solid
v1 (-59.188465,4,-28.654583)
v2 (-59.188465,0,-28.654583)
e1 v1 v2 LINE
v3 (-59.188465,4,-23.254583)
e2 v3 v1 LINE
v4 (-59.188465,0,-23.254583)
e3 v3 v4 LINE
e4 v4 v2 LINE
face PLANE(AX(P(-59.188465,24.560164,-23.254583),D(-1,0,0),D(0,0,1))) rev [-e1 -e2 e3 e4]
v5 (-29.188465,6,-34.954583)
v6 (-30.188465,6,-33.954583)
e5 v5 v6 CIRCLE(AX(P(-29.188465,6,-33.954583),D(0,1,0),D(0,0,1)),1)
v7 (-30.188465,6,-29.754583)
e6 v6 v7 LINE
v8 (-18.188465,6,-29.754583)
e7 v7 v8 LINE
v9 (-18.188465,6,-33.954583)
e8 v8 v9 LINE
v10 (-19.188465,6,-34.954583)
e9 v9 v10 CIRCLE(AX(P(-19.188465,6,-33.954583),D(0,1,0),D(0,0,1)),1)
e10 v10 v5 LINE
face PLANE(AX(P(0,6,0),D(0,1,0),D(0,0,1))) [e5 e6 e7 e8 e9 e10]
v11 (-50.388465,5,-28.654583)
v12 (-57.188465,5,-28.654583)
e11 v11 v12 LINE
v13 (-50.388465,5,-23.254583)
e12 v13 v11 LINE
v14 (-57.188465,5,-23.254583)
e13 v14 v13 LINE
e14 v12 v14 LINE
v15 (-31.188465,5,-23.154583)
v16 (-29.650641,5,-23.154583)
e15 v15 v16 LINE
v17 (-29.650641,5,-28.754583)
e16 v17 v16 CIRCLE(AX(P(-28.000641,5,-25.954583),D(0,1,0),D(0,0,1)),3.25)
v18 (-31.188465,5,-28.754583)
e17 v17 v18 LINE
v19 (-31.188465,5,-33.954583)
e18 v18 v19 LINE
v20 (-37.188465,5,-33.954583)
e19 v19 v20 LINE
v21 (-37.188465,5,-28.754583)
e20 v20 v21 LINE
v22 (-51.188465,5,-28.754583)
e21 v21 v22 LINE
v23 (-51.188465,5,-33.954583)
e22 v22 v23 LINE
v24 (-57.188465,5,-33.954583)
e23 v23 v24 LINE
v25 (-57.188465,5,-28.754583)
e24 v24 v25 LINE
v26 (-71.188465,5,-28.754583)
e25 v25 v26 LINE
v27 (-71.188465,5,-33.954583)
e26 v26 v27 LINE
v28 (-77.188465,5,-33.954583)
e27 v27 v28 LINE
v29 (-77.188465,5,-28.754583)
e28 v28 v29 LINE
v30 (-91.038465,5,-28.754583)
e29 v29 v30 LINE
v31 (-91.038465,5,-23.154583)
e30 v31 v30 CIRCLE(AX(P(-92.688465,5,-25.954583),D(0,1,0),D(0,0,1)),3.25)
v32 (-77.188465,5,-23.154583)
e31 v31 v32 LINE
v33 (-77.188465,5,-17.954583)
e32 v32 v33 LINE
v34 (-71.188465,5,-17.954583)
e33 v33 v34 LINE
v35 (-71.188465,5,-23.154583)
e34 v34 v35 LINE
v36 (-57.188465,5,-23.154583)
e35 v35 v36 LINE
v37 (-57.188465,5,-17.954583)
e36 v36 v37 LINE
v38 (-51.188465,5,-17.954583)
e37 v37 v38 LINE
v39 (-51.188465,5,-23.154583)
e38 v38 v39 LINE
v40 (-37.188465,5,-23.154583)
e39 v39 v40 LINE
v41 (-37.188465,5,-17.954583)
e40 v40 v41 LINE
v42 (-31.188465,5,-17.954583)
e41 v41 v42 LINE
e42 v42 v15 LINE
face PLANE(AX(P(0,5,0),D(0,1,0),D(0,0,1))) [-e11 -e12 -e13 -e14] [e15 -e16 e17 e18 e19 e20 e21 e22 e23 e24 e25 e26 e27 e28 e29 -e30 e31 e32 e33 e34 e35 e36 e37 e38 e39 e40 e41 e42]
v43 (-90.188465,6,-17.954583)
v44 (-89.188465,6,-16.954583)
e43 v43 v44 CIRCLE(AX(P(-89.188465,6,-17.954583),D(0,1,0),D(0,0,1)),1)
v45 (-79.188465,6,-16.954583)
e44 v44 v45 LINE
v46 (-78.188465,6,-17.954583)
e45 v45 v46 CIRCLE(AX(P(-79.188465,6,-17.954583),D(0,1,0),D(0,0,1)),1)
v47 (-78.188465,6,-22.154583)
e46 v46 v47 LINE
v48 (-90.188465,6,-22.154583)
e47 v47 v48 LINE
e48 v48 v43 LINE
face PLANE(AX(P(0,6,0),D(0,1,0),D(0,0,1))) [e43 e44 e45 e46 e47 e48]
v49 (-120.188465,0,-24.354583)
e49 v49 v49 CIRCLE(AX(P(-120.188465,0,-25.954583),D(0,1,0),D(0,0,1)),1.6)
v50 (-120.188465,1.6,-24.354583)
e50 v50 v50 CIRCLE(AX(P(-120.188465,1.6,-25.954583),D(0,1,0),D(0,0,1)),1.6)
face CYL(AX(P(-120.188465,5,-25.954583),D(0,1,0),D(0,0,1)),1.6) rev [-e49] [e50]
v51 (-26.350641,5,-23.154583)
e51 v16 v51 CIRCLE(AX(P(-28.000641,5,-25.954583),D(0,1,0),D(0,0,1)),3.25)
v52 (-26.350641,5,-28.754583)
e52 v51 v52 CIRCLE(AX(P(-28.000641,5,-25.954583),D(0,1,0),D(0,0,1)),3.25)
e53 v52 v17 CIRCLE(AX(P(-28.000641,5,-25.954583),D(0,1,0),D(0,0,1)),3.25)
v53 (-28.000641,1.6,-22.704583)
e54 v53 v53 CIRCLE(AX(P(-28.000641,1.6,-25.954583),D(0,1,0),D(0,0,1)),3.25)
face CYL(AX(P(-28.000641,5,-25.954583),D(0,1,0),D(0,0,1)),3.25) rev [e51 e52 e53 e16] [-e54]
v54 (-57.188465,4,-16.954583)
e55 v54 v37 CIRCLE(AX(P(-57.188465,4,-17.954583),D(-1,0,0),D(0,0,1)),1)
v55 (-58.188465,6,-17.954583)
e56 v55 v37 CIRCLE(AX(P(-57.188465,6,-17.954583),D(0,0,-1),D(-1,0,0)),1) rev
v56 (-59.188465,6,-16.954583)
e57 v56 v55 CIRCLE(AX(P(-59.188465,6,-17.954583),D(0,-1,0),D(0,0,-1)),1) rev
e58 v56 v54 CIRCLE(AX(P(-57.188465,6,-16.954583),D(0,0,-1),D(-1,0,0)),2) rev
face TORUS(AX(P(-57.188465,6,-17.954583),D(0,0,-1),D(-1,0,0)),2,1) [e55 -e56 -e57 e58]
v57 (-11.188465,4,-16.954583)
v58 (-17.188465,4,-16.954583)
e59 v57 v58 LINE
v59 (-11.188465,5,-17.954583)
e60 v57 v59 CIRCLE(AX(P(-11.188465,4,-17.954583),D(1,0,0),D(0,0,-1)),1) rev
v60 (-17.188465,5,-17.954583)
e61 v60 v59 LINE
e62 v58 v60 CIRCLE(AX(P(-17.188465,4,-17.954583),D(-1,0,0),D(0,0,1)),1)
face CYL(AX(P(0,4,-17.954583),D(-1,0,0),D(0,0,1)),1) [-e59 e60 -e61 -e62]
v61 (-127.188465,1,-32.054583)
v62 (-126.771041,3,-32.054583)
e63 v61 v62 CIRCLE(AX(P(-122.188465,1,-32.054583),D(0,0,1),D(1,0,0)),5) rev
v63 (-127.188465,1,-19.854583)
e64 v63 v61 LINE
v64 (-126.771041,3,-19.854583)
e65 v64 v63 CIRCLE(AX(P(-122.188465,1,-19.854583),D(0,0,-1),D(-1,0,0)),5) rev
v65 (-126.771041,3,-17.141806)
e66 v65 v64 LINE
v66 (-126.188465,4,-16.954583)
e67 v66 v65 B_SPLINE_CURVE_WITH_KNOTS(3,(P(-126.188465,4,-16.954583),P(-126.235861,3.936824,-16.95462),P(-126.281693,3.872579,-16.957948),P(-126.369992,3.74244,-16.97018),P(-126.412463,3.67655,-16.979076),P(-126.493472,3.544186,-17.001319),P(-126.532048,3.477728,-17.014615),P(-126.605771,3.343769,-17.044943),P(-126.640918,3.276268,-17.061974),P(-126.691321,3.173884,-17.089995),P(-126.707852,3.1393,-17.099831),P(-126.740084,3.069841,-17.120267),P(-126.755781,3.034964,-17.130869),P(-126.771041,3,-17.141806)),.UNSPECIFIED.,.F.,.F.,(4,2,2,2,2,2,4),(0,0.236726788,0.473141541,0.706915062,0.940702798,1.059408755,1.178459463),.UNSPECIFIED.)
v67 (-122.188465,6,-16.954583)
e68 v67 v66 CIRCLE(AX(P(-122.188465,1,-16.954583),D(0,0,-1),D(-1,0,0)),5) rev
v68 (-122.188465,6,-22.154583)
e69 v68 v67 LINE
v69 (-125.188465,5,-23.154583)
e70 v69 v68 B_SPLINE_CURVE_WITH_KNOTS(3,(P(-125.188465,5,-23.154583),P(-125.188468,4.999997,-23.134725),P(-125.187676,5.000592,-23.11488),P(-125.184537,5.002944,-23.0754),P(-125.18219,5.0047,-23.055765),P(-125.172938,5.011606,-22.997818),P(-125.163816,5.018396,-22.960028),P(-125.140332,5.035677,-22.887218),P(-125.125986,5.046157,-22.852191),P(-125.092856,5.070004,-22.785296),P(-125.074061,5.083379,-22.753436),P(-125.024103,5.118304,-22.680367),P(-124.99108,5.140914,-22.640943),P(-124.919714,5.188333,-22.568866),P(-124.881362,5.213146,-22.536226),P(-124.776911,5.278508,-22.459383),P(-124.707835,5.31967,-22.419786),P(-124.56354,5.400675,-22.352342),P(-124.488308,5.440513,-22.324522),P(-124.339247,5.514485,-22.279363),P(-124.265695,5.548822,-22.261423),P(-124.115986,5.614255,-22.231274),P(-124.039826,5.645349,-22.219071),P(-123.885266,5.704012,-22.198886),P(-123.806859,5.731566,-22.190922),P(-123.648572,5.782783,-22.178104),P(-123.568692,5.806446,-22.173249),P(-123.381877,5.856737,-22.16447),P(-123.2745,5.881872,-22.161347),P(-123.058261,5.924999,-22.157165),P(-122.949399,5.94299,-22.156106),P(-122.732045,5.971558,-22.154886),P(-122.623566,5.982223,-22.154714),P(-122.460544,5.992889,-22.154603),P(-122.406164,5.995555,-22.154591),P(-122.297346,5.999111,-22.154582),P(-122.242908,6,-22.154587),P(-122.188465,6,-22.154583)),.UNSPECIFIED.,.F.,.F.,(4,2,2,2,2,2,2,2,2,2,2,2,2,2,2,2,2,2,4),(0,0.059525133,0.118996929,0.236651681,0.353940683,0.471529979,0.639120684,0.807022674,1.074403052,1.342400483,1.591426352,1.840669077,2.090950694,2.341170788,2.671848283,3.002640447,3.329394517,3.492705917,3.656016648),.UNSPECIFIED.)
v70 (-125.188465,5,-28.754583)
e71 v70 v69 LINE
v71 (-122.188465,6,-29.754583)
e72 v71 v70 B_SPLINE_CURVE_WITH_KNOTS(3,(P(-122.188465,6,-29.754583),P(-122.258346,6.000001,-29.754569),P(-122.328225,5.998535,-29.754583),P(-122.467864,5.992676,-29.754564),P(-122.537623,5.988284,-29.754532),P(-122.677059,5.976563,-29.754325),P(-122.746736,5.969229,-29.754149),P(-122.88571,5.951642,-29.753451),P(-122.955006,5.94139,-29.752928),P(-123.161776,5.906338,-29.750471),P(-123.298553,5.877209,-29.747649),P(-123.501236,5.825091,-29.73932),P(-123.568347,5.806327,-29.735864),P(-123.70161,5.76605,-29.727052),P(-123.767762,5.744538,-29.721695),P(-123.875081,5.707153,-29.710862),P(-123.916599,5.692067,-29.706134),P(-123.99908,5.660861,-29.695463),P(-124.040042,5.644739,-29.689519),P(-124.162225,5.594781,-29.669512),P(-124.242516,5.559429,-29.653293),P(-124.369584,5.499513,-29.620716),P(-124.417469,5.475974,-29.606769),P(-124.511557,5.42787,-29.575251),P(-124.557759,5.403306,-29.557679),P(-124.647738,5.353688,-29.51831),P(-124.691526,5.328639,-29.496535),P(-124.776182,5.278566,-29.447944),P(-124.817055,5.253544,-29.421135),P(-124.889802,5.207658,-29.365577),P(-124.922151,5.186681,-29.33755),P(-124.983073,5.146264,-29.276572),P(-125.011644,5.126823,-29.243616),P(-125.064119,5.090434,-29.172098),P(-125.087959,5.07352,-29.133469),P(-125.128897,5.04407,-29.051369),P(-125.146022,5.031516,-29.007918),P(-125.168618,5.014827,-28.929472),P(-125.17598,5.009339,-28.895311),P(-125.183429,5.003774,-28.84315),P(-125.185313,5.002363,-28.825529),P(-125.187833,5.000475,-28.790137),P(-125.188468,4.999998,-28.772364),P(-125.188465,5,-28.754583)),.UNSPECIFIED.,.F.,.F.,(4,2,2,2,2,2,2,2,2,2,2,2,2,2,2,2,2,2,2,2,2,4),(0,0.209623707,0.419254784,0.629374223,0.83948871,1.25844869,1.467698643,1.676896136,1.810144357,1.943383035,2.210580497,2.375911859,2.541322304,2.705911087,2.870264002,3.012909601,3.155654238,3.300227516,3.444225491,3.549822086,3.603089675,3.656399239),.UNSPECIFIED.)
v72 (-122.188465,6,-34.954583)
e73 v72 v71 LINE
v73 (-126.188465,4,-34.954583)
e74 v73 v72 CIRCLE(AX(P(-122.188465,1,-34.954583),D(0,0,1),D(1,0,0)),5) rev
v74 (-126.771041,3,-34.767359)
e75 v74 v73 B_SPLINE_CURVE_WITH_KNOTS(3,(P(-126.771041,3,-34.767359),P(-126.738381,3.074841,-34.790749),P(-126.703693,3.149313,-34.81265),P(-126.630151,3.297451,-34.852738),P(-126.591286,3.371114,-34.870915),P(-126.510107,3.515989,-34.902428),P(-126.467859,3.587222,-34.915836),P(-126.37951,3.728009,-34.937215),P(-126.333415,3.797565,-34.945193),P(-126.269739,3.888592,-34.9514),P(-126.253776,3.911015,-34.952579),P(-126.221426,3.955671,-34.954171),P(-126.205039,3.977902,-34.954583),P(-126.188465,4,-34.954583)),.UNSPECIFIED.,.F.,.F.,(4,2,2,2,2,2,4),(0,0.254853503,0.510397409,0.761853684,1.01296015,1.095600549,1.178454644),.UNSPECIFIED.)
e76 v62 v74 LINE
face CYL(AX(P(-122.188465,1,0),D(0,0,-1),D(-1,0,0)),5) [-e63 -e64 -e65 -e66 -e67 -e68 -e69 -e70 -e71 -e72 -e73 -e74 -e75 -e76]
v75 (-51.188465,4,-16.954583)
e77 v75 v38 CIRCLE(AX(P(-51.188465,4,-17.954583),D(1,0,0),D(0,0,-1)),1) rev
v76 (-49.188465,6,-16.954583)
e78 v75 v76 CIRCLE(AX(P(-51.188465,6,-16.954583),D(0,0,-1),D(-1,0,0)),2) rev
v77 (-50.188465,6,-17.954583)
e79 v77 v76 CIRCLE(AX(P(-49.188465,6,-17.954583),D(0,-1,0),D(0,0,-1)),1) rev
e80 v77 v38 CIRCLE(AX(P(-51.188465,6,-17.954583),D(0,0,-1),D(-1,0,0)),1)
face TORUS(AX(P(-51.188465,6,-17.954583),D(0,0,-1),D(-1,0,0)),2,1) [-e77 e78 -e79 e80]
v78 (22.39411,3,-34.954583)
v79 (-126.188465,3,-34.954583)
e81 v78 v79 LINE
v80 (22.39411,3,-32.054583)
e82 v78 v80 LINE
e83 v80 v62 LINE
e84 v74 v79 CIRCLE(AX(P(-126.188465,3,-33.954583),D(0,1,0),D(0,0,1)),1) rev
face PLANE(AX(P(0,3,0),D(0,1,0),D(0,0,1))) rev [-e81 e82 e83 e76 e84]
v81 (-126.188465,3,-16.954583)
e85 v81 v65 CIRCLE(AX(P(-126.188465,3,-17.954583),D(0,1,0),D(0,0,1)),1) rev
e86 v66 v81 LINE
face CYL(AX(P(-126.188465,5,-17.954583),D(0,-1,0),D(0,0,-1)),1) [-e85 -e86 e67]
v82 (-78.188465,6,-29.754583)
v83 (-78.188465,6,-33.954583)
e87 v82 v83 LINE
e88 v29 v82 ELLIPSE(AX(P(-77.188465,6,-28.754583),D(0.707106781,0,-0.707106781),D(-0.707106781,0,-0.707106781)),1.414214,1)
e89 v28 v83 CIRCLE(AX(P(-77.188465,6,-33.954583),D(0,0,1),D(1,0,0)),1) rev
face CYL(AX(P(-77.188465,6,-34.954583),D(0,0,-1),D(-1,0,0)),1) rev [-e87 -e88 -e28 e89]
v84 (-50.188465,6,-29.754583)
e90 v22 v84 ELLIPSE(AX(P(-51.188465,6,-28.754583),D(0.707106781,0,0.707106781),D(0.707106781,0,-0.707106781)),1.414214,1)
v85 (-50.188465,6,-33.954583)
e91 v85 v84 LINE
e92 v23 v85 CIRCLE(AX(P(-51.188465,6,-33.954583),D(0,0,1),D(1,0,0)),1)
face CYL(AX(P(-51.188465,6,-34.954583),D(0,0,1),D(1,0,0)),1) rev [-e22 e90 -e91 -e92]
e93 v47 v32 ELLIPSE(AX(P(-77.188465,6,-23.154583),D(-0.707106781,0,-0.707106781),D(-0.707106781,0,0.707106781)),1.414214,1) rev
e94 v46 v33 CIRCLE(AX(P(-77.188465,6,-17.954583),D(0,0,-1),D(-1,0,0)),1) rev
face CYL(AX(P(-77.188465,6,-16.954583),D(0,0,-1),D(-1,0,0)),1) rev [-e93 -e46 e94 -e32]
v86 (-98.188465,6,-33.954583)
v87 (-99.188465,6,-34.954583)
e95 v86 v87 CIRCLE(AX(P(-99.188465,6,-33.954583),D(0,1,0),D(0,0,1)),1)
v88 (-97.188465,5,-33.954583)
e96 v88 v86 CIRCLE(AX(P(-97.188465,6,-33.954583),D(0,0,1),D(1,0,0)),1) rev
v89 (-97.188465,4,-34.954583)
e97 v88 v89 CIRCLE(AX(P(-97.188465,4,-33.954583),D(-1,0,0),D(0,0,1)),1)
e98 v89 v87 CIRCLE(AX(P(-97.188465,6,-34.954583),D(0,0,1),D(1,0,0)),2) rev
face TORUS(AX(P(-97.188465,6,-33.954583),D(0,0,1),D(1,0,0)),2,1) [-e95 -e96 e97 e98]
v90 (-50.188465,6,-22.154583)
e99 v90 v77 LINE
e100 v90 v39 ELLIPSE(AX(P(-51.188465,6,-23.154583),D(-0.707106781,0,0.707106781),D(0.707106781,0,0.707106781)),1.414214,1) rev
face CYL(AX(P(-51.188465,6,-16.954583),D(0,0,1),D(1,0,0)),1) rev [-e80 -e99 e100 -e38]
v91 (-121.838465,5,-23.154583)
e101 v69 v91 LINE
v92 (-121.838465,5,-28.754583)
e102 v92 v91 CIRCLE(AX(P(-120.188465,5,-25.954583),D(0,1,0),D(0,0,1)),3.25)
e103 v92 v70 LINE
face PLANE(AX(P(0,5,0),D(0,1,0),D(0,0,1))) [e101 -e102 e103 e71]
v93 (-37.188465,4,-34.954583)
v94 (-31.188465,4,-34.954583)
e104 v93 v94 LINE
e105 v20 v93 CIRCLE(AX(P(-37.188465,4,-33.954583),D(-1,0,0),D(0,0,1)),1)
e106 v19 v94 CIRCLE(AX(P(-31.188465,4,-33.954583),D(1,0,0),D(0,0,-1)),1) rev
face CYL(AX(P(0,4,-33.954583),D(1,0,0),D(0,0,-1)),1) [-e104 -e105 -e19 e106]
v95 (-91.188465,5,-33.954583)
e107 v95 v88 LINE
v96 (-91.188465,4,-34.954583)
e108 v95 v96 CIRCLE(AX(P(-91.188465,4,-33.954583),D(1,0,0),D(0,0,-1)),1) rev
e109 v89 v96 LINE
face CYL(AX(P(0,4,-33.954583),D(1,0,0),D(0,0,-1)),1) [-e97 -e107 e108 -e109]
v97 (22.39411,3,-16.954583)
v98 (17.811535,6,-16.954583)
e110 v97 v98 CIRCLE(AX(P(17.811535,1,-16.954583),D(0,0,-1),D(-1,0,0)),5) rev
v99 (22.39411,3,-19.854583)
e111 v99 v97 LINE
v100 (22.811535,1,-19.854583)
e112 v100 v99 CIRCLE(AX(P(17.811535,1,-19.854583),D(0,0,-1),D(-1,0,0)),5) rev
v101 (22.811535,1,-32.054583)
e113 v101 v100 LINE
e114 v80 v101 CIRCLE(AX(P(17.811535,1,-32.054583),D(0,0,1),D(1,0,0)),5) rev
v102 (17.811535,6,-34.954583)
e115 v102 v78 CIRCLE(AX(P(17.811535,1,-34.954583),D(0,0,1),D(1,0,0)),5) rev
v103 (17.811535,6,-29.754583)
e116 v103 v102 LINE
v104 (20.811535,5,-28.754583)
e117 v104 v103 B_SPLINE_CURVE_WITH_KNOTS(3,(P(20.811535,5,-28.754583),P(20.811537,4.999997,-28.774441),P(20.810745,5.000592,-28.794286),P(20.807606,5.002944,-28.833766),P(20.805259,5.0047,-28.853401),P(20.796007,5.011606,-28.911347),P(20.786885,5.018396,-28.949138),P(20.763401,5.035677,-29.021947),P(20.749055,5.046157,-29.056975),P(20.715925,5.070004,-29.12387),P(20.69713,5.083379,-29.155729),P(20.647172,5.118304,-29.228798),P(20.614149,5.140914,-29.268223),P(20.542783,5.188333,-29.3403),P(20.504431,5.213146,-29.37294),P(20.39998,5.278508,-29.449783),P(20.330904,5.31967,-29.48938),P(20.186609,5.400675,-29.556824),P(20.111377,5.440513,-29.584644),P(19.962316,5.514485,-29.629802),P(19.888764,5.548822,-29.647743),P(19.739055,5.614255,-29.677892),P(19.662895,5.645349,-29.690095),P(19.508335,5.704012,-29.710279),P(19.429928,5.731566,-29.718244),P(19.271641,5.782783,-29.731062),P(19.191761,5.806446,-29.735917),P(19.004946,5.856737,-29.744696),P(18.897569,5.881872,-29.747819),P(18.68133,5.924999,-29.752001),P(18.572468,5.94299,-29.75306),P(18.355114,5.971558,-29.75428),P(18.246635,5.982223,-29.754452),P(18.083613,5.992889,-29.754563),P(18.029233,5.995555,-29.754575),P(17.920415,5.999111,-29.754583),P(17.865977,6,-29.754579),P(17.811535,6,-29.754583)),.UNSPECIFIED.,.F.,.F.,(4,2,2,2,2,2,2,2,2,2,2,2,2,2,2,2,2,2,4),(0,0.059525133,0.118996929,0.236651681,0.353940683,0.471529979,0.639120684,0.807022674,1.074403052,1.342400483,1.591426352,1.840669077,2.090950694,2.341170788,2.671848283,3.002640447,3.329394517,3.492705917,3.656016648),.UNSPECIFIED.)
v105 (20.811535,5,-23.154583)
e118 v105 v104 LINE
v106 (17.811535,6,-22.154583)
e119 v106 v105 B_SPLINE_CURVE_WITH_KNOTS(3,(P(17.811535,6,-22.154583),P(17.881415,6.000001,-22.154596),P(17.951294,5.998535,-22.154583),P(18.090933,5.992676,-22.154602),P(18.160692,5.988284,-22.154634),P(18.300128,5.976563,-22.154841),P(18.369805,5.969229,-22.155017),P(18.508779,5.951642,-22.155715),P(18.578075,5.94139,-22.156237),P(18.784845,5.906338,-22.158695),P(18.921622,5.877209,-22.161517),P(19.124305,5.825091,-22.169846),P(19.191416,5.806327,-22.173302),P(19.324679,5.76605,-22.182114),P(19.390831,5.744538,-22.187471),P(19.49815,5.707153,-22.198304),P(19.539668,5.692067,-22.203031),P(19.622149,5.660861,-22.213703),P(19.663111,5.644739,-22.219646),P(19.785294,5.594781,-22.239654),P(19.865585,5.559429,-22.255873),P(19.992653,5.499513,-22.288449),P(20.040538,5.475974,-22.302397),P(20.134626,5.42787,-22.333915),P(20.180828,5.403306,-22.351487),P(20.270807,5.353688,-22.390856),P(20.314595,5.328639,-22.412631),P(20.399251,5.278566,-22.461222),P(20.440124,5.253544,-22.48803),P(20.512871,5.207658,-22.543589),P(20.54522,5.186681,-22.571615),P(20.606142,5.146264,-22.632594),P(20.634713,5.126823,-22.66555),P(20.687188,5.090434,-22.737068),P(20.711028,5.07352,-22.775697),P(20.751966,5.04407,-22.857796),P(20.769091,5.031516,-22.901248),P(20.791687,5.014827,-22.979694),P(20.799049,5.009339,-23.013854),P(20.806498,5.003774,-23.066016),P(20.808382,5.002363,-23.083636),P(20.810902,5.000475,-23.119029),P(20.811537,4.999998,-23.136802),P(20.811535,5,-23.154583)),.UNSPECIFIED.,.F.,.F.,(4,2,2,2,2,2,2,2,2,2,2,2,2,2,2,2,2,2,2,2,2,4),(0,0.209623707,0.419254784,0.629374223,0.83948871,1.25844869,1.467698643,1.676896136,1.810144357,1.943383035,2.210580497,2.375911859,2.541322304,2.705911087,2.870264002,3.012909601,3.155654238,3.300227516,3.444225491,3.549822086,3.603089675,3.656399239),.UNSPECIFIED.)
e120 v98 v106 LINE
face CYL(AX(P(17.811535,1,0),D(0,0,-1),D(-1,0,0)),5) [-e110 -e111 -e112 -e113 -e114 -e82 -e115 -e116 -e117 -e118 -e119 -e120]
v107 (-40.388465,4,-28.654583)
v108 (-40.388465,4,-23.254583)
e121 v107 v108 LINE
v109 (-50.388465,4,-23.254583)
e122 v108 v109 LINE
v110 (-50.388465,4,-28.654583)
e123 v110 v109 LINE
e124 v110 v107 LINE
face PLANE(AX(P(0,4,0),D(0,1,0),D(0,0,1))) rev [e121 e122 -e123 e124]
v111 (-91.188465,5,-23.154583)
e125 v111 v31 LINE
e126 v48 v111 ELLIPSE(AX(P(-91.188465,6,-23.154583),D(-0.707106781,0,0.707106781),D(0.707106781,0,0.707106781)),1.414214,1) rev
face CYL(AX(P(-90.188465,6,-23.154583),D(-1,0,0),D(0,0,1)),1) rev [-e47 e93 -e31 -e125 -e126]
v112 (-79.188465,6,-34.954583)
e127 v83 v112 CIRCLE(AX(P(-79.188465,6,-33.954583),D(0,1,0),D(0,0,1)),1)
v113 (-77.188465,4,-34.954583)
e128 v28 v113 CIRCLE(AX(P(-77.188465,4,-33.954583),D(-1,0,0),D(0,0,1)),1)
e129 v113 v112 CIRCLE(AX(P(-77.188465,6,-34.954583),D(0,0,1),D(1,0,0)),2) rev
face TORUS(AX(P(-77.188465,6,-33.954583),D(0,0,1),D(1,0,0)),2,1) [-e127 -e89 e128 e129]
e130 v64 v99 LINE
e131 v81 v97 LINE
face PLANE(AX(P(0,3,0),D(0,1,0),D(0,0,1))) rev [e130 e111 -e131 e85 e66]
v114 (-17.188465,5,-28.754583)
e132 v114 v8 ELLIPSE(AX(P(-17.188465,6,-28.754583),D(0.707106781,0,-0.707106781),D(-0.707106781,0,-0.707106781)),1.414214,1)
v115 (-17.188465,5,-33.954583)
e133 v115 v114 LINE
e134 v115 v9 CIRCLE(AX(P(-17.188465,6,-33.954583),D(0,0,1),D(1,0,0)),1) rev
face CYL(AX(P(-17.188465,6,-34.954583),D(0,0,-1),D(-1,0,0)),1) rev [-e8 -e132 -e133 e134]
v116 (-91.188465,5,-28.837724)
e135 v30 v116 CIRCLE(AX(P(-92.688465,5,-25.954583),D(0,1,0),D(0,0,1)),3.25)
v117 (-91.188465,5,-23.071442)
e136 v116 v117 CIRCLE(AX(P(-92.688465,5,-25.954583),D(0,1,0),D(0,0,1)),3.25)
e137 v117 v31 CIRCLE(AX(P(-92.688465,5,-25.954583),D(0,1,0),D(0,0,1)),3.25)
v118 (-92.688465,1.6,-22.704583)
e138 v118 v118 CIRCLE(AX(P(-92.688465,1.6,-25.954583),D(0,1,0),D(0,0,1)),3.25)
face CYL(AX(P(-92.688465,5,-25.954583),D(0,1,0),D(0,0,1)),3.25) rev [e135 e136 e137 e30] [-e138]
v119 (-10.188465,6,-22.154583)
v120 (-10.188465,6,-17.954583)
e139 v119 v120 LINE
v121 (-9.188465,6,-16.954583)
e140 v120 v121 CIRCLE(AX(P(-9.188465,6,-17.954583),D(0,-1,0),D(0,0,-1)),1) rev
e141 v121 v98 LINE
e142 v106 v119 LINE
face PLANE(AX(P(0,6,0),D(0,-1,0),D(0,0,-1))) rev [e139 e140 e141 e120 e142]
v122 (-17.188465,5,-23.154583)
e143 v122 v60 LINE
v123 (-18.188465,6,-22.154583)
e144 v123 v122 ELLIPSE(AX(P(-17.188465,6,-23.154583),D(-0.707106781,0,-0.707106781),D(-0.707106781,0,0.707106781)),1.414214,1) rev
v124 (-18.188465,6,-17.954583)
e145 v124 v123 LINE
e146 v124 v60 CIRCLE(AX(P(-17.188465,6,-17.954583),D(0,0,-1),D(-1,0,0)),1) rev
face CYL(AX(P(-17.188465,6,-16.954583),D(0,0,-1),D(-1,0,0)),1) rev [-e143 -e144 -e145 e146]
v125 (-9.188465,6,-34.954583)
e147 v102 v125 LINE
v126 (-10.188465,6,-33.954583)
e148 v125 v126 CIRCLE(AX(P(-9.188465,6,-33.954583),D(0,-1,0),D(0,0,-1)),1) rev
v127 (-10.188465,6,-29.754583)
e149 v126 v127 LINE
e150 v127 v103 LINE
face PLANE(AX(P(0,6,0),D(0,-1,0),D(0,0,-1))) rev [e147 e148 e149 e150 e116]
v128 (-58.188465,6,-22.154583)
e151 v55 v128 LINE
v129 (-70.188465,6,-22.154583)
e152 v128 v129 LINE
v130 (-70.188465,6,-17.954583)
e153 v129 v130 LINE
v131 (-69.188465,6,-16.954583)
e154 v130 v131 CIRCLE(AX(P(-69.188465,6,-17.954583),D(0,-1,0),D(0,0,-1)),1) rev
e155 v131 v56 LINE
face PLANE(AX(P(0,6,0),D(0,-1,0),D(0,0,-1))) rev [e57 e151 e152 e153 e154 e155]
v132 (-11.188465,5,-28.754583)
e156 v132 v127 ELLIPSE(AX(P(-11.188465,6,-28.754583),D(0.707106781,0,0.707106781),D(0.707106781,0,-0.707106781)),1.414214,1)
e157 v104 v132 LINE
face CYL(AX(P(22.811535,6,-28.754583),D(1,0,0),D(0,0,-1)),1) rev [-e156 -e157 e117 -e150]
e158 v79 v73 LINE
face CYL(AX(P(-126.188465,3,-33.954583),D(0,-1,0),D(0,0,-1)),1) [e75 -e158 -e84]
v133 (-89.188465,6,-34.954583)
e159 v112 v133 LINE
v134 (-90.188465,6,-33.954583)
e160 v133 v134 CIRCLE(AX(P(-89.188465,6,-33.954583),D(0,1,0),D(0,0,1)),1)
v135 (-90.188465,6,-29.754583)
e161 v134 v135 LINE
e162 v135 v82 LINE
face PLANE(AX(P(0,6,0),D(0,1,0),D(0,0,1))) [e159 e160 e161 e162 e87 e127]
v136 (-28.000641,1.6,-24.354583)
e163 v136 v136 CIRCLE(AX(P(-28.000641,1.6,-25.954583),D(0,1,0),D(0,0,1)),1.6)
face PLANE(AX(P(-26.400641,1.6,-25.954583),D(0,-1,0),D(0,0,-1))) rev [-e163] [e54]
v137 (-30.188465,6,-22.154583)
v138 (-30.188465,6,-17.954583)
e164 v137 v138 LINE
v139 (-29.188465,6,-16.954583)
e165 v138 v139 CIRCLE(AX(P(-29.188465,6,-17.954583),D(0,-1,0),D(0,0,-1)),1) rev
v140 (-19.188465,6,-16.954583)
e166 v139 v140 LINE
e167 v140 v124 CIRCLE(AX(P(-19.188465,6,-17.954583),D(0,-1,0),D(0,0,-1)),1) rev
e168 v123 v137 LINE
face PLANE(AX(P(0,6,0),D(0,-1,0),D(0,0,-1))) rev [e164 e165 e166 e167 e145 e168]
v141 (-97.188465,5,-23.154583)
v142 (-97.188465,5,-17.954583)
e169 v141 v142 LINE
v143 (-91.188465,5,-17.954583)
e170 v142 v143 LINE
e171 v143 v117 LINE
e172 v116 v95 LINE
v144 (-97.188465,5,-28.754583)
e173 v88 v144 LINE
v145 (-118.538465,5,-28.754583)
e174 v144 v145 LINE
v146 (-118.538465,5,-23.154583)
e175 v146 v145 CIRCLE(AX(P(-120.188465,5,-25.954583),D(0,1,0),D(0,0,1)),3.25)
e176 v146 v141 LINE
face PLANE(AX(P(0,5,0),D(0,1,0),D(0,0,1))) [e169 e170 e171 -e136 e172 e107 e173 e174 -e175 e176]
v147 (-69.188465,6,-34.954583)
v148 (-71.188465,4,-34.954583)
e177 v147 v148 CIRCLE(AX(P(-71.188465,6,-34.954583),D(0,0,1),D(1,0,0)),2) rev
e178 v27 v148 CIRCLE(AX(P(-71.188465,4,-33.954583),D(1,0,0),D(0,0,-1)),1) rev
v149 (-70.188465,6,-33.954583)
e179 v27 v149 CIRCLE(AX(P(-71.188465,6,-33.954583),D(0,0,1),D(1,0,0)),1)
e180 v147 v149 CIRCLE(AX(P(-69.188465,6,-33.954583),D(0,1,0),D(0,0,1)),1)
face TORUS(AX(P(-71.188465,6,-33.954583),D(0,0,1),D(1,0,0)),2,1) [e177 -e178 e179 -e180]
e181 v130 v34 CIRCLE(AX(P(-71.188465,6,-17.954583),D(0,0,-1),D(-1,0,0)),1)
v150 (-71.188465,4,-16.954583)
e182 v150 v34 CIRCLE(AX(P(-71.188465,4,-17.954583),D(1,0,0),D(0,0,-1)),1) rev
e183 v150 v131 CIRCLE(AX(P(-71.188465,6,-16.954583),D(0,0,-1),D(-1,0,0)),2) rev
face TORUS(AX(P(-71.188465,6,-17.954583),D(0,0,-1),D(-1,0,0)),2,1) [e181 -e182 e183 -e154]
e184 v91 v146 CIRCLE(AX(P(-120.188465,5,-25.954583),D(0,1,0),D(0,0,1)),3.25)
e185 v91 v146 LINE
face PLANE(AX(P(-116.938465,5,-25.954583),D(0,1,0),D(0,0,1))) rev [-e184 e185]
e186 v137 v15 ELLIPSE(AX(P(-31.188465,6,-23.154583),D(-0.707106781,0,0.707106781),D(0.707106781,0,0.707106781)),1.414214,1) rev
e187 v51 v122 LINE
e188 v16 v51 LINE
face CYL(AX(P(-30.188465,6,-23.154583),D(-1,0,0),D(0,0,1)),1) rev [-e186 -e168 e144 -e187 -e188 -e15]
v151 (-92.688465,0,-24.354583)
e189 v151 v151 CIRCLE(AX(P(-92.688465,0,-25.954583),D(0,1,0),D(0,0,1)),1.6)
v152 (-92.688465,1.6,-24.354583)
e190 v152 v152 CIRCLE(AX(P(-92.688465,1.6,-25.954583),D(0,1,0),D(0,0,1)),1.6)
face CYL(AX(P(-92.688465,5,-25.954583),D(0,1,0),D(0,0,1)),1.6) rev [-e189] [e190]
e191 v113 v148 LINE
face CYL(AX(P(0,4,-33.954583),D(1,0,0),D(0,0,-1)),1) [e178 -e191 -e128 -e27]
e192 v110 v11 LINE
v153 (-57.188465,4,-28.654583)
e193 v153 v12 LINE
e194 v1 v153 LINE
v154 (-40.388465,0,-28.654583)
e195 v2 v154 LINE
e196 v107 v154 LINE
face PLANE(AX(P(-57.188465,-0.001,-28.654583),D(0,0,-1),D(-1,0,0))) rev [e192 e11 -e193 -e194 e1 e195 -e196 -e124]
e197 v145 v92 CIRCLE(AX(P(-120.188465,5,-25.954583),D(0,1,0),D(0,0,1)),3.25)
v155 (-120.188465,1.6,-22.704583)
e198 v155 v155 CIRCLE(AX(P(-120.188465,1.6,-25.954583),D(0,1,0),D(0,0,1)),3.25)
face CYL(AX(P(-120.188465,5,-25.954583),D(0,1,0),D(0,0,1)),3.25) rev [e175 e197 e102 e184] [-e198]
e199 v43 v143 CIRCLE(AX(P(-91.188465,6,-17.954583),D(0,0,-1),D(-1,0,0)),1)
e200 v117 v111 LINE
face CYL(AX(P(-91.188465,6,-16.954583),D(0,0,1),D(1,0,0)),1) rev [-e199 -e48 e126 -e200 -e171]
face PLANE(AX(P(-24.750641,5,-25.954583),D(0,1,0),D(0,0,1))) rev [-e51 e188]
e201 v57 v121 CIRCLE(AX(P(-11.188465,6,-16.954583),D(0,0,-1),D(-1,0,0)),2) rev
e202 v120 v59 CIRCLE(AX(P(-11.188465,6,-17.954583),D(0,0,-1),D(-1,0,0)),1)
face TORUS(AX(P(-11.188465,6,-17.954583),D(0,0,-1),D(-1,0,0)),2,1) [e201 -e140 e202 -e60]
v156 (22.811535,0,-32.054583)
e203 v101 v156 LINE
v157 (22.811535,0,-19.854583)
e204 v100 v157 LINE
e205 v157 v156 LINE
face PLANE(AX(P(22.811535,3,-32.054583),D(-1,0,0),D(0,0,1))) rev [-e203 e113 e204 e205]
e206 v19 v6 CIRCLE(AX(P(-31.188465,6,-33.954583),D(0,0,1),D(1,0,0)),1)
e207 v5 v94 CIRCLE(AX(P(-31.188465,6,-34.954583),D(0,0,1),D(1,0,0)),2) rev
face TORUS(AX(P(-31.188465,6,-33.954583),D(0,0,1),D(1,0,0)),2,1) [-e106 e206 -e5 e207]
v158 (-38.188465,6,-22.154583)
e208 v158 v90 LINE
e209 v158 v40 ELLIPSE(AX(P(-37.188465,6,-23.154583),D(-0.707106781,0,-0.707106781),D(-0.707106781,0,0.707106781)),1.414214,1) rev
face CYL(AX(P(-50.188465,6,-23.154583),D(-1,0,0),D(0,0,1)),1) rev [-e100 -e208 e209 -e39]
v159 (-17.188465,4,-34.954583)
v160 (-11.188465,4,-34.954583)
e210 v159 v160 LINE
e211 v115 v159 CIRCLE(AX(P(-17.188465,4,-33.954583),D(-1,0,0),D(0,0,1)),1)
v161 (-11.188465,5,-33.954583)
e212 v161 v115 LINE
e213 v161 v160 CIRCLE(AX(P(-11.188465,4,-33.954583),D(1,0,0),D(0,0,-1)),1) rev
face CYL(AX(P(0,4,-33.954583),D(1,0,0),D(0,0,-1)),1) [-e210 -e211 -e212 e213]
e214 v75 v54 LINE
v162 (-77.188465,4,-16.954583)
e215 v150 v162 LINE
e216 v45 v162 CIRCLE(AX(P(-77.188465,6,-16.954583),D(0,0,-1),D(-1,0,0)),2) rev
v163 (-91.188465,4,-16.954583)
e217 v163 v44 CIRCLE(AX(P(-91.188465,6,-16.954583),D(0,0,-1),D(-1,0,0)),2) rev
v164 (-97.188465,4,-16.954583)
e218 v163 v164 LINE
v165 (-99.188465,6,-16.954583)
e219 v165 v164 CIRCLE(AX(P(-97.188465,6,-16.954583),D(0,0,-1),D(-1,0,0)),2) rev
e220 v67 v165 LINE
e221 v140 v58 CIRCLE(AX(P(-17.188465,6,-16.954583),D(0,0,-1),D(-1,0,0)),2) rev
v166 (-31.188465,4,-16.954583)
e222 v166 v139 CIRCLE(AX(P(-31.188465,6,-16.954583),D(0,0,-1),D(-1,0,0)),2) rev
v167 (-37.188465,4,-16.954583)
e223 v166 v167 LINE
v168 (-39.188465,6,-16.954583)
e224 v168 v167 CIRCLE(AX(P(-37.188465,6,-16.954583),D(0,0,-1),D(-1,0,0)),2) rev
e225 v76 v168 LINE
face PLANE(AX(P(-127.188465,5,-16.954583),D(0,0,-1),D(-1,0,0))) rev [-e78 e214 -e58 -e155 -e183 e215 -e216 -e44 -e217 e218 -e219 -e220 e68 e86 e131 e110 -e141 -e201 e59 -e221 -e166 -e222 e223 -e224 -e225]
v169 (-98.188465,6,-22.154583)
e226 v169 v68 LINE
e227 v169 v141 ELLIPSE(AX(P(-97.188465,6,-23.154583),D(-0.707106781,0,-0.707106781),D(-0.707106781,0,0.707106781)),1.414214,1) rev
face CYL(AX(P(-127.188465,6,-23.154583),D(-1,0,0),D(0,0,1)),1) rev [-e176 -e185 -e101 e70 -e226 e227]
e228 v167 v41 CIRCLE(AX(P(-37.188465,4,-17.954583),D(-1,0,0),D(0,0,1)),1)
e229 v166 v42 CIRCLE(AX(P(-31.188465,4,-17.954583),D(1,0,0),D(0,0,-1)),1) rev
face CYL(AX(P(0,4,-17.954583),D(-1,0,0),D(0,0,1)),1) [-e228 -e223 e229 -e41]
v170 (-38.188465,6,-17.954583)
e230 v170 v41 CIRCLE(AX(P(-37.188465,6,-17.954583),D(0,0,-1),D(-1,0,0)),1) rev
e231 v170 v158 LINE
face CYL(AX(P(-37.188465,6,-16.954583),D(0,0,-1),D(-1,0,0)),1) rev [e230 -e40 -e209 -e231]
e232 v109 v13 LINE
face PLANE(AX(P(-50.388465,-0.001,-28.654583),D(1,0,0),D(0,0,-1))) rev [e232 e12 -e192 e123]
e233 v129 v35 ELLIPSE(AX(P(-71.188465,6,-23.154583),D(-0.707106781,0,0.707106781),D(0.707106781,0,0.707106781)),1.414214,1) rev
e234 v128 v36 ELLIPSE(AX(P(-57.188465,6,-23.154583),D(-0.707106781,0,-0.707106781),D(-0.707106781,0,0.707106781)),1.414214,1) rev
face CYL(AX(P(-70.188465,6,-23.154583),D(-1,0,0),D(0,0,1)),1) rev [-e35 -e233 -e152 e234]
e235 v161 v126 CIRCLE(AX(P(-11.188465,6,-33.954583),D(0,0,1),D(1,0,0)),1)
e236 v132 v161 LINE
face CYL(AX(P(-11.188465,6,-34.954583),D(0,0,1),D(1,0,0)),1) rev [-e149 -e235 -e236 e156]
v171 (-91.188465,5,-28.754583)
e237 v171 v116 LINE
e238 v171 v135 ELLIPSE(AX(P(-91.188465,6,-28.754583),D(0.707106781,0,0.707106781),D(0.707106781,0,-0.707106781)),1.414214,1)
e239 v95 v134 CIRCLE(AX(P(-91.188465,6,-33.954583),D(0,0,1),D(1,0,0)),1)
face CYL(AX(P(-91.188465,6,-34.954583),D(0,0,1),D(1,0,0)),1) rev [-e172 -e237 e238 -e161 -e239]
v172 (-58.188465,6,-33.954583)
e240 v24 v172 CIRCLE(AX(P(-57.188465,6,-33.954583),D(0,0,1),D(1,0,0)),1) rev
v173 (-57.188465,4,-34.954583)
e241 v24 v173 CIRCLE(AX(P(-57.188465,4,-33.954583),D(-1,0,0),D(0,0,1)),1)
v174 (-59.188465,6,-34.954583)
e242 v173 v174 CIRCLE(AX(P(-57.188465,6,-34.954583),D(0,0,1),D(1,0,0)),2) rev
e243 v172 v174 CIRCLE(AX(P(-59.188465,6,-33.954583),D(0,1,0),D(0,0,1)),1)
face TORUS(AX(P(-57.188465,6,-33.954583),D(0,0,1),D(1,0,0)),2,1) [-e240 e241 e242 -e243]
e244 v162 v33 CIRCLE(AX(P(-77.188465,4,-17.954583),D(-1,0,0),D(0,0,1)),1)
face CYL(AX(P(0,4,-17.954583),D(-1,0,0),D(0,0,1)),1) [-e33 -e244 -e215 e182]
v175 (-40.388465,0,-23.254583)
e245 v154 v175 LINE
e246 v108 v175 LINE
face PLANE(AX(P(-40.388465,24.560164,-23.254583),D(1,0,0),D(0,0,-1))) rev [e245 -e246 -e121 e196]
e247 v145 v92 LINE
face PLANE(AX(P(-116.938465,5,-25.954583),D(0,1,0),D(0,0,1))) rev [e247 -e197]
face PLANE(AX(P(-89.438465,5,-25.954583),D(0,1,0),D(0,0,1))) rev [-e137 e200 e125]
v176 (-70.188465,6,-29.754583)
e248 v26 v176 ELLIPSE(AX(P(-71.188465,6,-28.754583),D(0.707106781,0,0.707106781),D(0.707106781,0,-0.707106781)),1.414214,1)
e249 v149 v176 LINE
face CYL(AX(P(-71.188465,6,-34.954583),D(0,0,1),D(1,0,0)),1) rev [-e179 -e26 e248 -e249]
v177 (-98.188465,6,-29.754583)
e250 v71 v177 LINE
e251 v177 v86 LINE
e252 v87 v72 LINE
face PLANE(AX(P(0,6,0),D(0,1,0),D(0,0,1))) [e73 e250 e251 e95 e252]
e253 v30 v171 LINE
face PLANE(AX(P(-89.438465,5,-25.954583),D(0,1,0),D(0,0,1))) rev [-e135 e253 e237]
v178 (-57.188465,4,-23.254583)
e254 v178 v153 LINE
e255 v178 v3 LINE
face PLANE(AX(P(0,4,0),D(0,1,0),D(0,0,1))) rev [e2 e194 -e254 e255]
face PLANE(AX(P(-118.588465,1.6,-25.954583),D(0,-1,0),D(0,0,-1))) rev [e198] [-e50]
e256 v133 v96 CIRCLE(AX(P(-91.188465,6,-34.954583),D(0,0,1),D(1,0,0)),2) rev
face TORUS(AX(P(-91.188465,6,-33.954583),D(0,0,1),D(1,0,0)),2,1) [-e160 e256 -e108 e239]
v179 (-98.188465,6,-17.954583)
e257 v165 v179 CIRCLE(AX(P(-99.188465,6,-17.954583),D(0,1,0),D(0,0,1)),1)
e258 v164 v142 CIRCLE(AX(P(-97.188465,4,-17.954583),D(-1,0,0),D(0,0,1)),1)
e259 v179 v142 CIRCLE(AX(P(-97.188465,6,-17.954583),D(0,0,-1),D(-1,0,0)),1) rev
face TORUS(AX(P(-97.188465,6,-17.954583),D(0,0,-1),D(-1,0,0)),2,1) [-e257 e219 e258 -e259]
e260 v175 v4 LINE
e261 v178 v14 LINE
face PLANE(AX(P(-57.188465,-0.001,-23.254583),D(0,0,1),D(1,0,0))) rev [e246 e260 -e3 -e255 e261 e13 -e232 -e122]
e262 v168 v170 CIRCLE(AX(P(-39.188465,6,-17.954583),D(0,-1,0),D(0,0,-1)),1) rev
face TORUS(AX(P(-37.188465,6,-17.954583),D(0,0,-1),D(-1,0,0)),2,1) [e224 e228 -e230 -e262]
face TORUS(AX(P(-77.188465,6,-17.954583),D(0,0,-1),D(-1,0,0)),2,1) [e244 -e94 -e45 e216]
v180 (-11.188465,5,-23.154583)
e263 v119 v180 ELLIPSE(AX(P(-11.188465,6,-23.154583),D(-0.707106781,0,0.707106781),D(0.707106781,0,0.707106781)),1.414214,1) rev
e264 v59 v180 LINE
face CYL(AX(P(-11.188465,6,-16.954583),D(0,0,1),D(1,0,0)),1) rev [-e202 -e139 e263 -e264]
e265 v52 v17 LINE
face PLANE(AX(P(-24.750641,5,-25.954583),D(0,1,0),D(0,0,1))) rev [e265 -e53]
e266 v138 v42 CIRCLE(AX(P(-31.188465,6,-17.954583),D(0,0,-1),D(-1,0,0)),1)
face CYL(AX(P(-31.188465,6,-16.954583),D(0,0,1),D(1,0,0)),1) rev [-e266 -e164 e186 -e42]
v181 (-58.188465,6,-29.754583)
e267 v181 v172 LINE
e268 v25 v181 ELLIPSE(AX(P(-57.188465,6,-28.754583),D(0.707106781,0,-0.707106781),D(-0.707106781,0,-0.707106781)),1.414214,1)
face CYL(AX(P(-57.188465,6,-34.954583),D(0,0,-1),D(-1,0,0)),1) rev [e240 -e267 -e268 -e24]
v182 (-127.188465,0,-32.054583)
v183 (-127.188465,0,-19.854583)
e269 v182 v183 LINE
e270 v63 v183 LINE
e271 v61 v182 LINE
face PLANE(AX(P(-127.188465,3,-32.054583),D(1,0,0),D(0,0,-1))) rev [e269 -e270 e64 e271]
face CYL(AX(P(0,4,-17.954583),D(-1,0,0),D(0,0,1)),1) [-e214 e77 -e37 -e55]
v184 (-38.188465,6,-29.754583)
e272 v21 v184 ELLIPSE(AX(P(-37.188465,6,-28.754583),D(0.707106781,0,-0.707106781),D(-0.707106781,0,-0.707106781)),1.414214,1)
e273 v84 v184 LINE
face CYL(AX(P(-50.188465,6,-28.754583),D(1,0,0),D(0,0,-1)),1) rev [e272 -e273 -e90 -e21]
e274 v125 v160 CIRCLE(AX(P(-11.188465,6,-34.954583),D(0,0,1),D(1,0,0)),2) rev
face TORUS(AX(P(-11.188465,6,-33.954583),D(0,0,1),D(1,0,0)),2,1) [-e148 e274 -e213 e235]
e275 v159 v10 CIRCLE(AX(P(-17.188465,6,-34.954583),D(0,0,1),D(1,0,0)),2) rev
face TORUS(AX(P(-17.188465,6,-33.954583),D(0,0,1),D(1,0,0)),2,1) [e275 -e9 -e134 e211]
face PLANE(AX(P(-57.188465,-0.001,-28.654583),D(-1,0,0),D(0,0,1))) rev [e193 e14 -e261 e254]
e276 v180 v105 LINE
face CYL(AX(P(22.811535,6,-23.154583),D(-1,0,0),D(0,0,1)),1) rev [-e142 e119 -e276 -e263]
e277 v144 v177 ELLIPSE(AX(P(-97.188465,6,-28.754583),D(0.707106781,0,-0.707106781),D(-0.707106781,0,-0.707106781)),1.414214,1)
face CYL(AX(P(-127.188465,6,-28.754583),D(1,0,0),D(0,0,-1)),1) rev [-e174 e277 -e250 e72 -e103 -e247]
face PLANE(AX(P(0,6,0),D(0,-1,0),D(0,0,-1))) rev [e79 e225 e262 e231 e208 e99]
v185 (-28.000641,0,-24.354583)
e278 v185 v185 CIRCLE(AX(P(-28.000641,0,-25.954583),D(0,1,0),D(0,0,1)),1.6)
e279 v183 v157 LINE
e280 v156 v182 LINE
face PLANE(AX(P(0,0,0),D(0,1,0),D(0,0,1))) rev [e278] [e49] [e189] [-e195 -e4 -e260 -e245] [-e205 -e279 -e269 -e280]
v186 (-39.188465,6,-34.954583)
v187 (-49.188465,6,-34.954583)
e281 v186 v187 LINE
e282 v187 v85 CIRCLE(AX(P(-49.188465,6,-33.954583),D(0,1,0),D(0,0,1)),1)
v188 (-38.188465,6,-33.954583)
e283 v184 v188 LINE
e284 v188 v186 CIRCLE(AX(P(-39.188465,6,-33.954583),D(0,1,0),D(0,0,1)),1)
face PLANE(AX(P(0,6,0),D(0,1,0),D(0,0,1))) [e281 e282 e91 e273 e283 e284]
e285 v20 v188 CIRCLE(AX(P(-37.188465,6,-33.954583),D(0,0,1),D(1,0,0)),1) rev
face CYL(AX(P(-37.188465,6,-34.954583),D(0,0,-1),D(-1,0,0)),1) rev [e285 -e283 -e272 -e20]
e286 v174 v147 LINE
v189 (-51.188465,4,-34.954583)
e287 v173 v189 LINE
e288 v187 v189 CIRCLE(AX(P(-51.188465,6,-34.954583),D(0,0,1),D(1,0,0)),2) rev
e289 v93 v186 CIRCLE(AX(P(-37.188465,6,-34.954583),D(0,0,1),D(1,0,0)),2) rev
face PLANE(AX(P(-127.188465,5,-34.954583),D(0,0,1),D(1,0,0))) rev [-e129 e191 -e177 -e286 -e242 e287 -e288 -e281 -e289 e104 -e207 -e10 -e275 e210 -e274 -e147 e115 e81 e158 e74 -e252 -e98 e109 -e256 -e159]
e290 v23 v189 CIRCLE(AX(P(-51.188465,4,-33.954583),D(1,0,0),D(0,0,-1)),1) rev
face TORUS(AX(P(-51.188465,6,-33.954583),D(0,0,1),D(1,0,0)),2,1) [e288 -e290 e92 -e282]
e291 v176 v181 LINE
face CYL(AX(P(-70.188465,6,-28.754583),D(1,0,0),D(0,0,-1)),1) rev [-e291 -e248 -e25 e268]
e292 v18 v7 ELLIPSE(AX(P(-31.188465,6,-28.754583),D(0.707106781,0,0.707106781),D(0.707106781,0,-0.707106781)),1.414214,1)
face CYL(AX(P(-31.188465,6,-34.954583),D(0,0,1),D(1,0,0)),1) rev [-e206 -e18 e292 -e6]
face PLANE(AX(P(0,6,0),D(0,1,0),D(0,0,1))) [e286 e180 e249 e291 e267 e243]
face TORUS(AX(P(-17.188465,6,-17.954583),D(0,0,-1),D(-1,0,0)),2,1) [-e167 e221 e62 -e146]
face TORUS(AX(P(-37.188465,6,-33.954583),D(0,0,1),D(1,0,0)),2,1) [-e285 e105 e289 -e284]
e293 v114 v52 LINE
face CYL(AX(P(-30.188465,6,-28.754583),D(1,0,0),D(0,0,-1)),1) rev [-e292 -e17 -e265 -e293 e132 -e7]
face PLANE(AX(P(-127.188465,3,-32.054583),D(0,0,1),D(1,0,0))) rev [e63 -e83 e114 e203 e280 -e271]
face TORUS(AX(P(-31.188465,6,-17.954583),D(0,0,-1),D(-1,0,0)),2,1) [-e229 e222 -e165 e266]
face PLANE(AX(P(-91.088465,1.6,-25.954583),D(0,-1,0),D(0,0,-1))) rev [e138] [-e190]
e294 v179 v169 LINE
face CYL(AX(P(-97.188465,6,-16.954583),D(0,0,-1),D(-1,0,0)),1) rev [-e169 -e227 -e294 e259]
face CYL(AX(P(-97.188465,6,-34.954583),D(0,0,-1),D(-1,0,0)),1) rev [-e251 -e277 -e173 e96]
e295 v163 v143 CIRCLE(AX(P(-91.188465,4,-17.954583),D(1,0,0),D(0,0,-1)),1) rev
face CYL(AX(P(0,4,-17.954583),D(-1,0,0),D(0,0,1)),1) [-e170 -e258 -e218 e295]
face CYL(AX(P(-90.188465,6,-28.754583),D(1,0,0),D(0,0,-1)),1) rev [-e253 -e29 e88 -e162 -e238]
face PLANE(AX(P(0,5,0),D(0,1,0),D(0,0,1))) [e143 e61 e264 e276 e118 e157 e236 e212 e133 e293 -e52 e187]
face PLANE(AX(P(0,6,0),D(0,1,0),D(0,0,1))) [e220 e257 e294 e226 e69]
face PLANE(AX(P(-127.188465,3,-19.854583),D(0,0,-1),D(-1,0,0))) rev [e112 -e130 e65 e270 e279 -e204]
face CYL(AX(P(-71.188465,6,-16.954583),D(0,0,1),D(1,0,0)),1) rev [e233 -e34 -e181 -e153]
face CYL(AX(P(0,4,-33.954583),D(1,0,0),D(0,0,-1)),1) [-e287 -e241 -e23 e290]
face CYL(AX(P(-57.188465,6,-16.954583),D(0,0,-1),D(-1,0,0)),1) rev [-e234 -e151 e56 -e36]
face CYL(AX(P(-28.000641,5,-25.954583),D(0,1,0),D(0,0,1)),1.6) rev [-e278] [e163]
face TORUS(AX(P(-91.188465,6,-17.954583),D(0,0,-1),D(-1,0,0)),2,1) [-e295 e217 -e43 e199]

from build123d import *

# Parameters (mm, degrees)
SKETCH1_W                                    = 150
SKETCH1_H                                    = 12.2
BOSS_EXTRUDE1_DEPTH                          = 3
SKETCH2_W                                    = 150
SKETCH2_H                                    = 18
BOSS_EXTRUDE2_DEPTH                          = 2
SKETCH3_W                                    = 29
SKETCH3_H                                    = 5.2
SKETCH3_W_2                                  = 12
SKETCH3_W_3                                  = 33
BOSS_EXTRUDE3_DEPTH                          = 1
FILLET1_R                                    = 1
CBORE_FOR_M3_HEX_SOCKET_THIN_HEAD_CA_2_COUNT = 2
CBORE_FOR_M3_HEX_SOCKET_THIN_HEAD_CA_2_PITCH = 64.687824932
CBORE_FOR_M3_HEX_SOCKET_THIN_HEAD_CA_3_COUNT = 2
CBORE_FOR_M3_HEX_SOCKET_THIN_HEAD_CA_3_PITCH = 27.5
FILLET2_START                                = -36
FILLET2_DEPTH                                = 20
FILLET3_START                                = -36
FILLET3_DEPTH                                = 20
CUT_EXTRUDE1_REACH                           = 133.999
SKETCH6_W                                    = 6.8
SKETCH6_H                                    = 5.4
SKETCH7_W                                    = 18.8
SKETCH7_H                                    = 5.4
CUT_EXTRUDE2_DEPTH                           = 4


with BuildPart() as part:
    # Sketch1 → Boss-Extrude1 (new body)
    with BuildSketch(Plane(origin=(0, 0, 0), x_dir=(1, 0, 0), z_dir=(0, 1, 0))):
        with Locations((-52.188465499, 25.954582904)):
            Rectangle(SKETCH1_W, SKETCH1_H)
    extrude(amount=BOSS_EXTRUDE1_DEPTH)

    # Sketch2 → Boss-Extrude2 (add)
    with BuildSketch(Plane(origin=(0, 3, 0), x_dir=(1, 0, 0), z_dir=(0, 1, 0))):
        with Locations((-52.188465499, 25.954582904)):
            Rectangle(SKETCH2_W, SKETCH2_H)
    extrude(amount=BOSS_EXTRUDE2_DEPTH)

    # Sketch3 → Boss-Extrude3 (add)
    with BuildSketch(Plane(origin=(0, 5, 0), x_dir=(1, 0, 0), z_dir=(0, 1, 0))):
        with Locations((-112.688465499, 32.354582904)):
            Rectangle(SKETCH3_W, SKETCH3_H)
        with Locations((-84.188465499, 32.354582904)):
            Rectangle(SKETCH3_W_2, SKETCH3_H)
        with Locations((-64.188465499, 32.354582904)):
            Rectangle(SKETCH3_W_2, SKETCH3_H)
        with Locations((-44.188465499, 32.354582904)):
            Rectangle(SKETCH3_W_2, SKETCH3_H)
        with Locations((-24.188465499, 32.354582904)):
            Rectangle(SKETCH3_W_2, SKETCH3_H)
        with Locations((6.311534501, 19.554582904)):
            Rectangle(SKETCH3_W_3, SKETCH3_H)
        with Locations((6.311534501, 32.354582904)):
            Rectangle(SKETCH3_W_3, SKETCH3_H)
        with Locations((-24.188465499, 19.554582904)):
            Rectangle(SKETCH3_W_2, SKETCH3_H)
        with Locations((-44.188465499, 19.554582904)):
            Rectangle(SKETCH3_W_2, SKETCH3_H)
        with Locations((-64.188465499, 19.554582904)):
            Rectangle(SKETCH3_W_2, SKETCH3_H)
        with Locations((-84.188465499, 19.554582904)):
            Rectangle(SKETCH3_W_2, SKETCH3_H)
        with Locations((-112.688465499, 19.554582904)):
            Rectangle(SKETCH3_W, SKETCH3_H)
    extrude(amount=BOSS_EXTRUDE3_DEPTH)

    # Fillet1
    fillet1_edges = [part.edges().sort_by_distance(p)[0] for p in [
        (-112.688465499, 5, -29.754582904),
        (-98.188465499, 5, -32.354582904),
        (-90.188465499, 5, -32.354582904),
        (-84.188465499, 5, -29.754582904),
        (-78.188465499, 5, -32.354582904),
        (-70.188465499, 5, -32.354582904),
        (-64.188465499, 5, -29.754582904),
        (-58.188465499, 5, -32.354582904),
        (-50.188465499, 5, -32.354582904),
        (-44.188465499, 5, -29.754582904),
        (-38.188465499, 5, -32.354582904),
        (-30.188465499, 5, -32.354582904),
        (-24.188465499, 5, -29.754582904),
        (-18.188465499, 5, -32.354582904),
        (-10.188465499, 5, -32.354582904),
        (6.311534501, 5, -29.754582904),
        (6.311534501, 5, -22.154582904),
        (-10.188465499, 5, -19.554582904),
        (-18.188465499, 5, -19.554582904),
        (-24.188465499, 5, -22.154582904),
        (-30.188465499, 5, -19.554582904),
        (-38.188465499, 5, -19.554582904),
        (-44.188465499, 5, -22.154582904),
        (-50.188465499, 5, -19.554582904),
        (-58.188465499, 5, -19.554582904),
        (-64.188465499, 5, -22.154582904),
        (-70.188465499, 5, -19.554582904),
        (-78.188465499, 5, -19.554582904),
        (-84.188465499, 5, -22.154582904),
        (-90.188465499, 5, -19.554582904),
        (-98.188465499, 5, -19.554582904),
        (-112.688465499, 5, -22.154582904),
    ]]
    fillet(fillet1_edges, radius=FILLET1_R - 0.0001)  # a hair under: the kernel refuses the full size
    fillet1_2_edges = [part.edges().sort_by_distance(p)[0] for p in [
        (-127.188465499, 5, -25.954582904),
        (-94.188465499, 5, -34.954582904),
        (-74.188465499, 5, -34.954582904),
        (-54.188465499, 5, -34.954582904),
        (-34.188465499, 5, -34.954582904),
        (-14.188465499, 5, -34.954582904),
        (22.811534501, 5, -25.954582904),
        (-127.188465499, 4.5, -34.954582904),
        (-127.188465499, 4.5, -16.954582904),
        (-14.188465499, 5, -16.954582904),
        (-34.188465499, 5, -16.954582904),
        (-54.188465499, 5, -16.954582904),
        (-74.188465499, 5, -16.954582904),
        (-94.188465499, 5, -16.954582904),
        (-90.481329429, 5.292863929, -16.954582904),
        (-97.89560157, 5.292863929, -16.954582904),
        (-70.481329429, 5.292863929, -16.954582904),
        (-77.89560157, 5.292863929, -16.954582904),
        (-50.481329429, 5.292863929, -16.954582904),
        (-57.89560157, 5.292863929, -16.954582904),
        (-30.481329429, 5.292863929, -16.954582904),
        (-37.89560157, 5.292863929, -16.954582904),
        (-10.481329429, 5.292863929, -16.954582904),
        (-17.89560157, 5.292863929, -16.954582904),
        (22.811534501, 5.292863929, -29.461718975),
        (22.811534501, 5.292863929, -22.447446834),
        (-17.89560157, 5.292863929, -34.954582904),
        (-10.481329429, 5.292863929, -34.954582904),
        (-37.89560157, 5.292863929, -34.954582904),
        (-30.481329429, 5.292863929, -34.954582904),
        (-57.89560157, 5.292863929, -34.954582904),
        (-50.481329429, 5.292863929, -34.954582904),
        (-77.89560157, 5.292863929, -34.954582904),
        (-70.481329429, 5.292863929, -34.954582904),
        (-97.89560157, 5.292863929, -34.954582904),
        (-90.481329429, 5.292863929, -34.954582904),
        (-127.188465499, 5.292863929, -22.447446834),
        (-127.188465499, 5.292863929, -29.461718975),
    ]]
    fillet(fillet1_2_edges, radius=FILLET1_R)

    # Sketch4 → CBORE for M3 Hex Socket Thin Head Cap Screw1 (revolve, cut)
    with BuildSketch(Plane(origin=(-92.688465499, 5, -25.954582904), x_dir=(0, 0, 1), z_dir=(1, 0, 0))):
        Polygon((0, 0), (0, 16.96137699), (1.6, 16), (1.6, 3.4), (3.25, 3.4), (3.25, 0), align=None)
    cbore_for_m3_hex_socket_thin_head_cap_sc = revolve(axis=Axis((-92.688465499, 11.35, -25.954582904), (0, -1, 0)), mode=Mode.SUBTRACT)

    # CBORE for M3 Hex Socket Thin Head Ca 2: CBORE for M3 Hex Socket Thin Head Cap Screw1 ×2
    with Locations(*[(i * CBORE_FOR_M3_HEX_SOCKET_THIN_HEAD_CA_2_PITCH, 0, 0) for i in range(1, CBORE_FOR_M3_HEX_SOCKET_THIN_HEAD_CA_2_COUNT)]):
        add(cbore_for_m3_hex_socket_thin_head_cap_sc, mode=Mode.SUBTRACT)

    # CBORE for M3 Hex Socket Thin Head Ca 3: CBORE for M3 Hex Socket Thin Head Cap Screw1 ×2
    with Locations(*[(-i * CBORE_FOR_M3_HEX_SOCKET_THIN_HEAD_CA_3_PITCH, 0, 0) for i in range(1, CBORE_FOR_M3_HEX_SOCKET_THIN_HEAD_CA_3_COUNT)]):
        add(cbore_for_m3_hex_socket_thin_head_cap_sc, mode=Mode.SUBTRACT)

    # Fillet2: read off the stored shape, not the designer's step
    # Fillet2 outline → Fillet2 (cut)
    with BuildSketch(Plane.XY.offset(FILLET2_START)):
        with BuildLine():
            Line((22.811534501, 6), (17.811534501, 6))
            ThreePointArc((17.811534501, 6), (21.347068407, 4.535533906), (22.811534501, 1))
            Line((22.811534501, 1), (22.811534501, 4))
            Line((22.811534501, 4), (22.811534501, 6))
        make_face()
    extrude(amount=FILLET2_DEPTH, mode=Mode.SUBTRACT)

    # Fillet3: read off the stored shape, not the designer's step
    # Fillet3 outline → Fillet3 (cut)
    with BuildSketch(Plane.XY.offset(FILLET3_START)):
        with BuildLine():
            ThreePointArc((-127.188465499, 1), (-125.723999405, 4.535533906), (-122.188465499, 6))
            Line((-122.188465499, 6), (-127.188465499, 6))
            Line((-127.188465499, 6), (-127.188465499, 1))
        make_face()
    extrude(amount=FILLET3_DEPTH, mode=Mode.SUBTRACT)

    # Sketch6 → Cut-Extrude1 (cut, up to next)
    with BuildSketch(Plane(origin=(0, 5, 0), x_dir=(1, 0, 0), z_dir=(0, 1, 0)), mode=Mode.PRIVATE) as cut_extrude1_sk1:
        with Locations((-53.788465499, 25.954582904)):
            Rectangle(SKETCH6_W, SKETCH6_H)
    cut_extrude1_tool1 = extrude(cut_extrude1_sk1.sketch, amount=-CUT_EXTRUDE1_REACH, mode=Mode.PRIVATE) & part.part
    add(cut_extrude1_tool1.solids().sort_by_distance((-53.788465, 5, -25.954583))[0], mode=Mode.SUBTRACT)

    # Sketch7 → Cut-Extrude2 (cut)
    with BuildSketch(Plane.XZ):
        with Locations((-49.788465499, -25.954582904)):
            Rectangle(SKETCH7_W, SKETCH7_H)
    extrude(amount=-CUT_EXTRUDE2_DEPTH, mode=Mode.SUBTRACT)


solid = part.part
